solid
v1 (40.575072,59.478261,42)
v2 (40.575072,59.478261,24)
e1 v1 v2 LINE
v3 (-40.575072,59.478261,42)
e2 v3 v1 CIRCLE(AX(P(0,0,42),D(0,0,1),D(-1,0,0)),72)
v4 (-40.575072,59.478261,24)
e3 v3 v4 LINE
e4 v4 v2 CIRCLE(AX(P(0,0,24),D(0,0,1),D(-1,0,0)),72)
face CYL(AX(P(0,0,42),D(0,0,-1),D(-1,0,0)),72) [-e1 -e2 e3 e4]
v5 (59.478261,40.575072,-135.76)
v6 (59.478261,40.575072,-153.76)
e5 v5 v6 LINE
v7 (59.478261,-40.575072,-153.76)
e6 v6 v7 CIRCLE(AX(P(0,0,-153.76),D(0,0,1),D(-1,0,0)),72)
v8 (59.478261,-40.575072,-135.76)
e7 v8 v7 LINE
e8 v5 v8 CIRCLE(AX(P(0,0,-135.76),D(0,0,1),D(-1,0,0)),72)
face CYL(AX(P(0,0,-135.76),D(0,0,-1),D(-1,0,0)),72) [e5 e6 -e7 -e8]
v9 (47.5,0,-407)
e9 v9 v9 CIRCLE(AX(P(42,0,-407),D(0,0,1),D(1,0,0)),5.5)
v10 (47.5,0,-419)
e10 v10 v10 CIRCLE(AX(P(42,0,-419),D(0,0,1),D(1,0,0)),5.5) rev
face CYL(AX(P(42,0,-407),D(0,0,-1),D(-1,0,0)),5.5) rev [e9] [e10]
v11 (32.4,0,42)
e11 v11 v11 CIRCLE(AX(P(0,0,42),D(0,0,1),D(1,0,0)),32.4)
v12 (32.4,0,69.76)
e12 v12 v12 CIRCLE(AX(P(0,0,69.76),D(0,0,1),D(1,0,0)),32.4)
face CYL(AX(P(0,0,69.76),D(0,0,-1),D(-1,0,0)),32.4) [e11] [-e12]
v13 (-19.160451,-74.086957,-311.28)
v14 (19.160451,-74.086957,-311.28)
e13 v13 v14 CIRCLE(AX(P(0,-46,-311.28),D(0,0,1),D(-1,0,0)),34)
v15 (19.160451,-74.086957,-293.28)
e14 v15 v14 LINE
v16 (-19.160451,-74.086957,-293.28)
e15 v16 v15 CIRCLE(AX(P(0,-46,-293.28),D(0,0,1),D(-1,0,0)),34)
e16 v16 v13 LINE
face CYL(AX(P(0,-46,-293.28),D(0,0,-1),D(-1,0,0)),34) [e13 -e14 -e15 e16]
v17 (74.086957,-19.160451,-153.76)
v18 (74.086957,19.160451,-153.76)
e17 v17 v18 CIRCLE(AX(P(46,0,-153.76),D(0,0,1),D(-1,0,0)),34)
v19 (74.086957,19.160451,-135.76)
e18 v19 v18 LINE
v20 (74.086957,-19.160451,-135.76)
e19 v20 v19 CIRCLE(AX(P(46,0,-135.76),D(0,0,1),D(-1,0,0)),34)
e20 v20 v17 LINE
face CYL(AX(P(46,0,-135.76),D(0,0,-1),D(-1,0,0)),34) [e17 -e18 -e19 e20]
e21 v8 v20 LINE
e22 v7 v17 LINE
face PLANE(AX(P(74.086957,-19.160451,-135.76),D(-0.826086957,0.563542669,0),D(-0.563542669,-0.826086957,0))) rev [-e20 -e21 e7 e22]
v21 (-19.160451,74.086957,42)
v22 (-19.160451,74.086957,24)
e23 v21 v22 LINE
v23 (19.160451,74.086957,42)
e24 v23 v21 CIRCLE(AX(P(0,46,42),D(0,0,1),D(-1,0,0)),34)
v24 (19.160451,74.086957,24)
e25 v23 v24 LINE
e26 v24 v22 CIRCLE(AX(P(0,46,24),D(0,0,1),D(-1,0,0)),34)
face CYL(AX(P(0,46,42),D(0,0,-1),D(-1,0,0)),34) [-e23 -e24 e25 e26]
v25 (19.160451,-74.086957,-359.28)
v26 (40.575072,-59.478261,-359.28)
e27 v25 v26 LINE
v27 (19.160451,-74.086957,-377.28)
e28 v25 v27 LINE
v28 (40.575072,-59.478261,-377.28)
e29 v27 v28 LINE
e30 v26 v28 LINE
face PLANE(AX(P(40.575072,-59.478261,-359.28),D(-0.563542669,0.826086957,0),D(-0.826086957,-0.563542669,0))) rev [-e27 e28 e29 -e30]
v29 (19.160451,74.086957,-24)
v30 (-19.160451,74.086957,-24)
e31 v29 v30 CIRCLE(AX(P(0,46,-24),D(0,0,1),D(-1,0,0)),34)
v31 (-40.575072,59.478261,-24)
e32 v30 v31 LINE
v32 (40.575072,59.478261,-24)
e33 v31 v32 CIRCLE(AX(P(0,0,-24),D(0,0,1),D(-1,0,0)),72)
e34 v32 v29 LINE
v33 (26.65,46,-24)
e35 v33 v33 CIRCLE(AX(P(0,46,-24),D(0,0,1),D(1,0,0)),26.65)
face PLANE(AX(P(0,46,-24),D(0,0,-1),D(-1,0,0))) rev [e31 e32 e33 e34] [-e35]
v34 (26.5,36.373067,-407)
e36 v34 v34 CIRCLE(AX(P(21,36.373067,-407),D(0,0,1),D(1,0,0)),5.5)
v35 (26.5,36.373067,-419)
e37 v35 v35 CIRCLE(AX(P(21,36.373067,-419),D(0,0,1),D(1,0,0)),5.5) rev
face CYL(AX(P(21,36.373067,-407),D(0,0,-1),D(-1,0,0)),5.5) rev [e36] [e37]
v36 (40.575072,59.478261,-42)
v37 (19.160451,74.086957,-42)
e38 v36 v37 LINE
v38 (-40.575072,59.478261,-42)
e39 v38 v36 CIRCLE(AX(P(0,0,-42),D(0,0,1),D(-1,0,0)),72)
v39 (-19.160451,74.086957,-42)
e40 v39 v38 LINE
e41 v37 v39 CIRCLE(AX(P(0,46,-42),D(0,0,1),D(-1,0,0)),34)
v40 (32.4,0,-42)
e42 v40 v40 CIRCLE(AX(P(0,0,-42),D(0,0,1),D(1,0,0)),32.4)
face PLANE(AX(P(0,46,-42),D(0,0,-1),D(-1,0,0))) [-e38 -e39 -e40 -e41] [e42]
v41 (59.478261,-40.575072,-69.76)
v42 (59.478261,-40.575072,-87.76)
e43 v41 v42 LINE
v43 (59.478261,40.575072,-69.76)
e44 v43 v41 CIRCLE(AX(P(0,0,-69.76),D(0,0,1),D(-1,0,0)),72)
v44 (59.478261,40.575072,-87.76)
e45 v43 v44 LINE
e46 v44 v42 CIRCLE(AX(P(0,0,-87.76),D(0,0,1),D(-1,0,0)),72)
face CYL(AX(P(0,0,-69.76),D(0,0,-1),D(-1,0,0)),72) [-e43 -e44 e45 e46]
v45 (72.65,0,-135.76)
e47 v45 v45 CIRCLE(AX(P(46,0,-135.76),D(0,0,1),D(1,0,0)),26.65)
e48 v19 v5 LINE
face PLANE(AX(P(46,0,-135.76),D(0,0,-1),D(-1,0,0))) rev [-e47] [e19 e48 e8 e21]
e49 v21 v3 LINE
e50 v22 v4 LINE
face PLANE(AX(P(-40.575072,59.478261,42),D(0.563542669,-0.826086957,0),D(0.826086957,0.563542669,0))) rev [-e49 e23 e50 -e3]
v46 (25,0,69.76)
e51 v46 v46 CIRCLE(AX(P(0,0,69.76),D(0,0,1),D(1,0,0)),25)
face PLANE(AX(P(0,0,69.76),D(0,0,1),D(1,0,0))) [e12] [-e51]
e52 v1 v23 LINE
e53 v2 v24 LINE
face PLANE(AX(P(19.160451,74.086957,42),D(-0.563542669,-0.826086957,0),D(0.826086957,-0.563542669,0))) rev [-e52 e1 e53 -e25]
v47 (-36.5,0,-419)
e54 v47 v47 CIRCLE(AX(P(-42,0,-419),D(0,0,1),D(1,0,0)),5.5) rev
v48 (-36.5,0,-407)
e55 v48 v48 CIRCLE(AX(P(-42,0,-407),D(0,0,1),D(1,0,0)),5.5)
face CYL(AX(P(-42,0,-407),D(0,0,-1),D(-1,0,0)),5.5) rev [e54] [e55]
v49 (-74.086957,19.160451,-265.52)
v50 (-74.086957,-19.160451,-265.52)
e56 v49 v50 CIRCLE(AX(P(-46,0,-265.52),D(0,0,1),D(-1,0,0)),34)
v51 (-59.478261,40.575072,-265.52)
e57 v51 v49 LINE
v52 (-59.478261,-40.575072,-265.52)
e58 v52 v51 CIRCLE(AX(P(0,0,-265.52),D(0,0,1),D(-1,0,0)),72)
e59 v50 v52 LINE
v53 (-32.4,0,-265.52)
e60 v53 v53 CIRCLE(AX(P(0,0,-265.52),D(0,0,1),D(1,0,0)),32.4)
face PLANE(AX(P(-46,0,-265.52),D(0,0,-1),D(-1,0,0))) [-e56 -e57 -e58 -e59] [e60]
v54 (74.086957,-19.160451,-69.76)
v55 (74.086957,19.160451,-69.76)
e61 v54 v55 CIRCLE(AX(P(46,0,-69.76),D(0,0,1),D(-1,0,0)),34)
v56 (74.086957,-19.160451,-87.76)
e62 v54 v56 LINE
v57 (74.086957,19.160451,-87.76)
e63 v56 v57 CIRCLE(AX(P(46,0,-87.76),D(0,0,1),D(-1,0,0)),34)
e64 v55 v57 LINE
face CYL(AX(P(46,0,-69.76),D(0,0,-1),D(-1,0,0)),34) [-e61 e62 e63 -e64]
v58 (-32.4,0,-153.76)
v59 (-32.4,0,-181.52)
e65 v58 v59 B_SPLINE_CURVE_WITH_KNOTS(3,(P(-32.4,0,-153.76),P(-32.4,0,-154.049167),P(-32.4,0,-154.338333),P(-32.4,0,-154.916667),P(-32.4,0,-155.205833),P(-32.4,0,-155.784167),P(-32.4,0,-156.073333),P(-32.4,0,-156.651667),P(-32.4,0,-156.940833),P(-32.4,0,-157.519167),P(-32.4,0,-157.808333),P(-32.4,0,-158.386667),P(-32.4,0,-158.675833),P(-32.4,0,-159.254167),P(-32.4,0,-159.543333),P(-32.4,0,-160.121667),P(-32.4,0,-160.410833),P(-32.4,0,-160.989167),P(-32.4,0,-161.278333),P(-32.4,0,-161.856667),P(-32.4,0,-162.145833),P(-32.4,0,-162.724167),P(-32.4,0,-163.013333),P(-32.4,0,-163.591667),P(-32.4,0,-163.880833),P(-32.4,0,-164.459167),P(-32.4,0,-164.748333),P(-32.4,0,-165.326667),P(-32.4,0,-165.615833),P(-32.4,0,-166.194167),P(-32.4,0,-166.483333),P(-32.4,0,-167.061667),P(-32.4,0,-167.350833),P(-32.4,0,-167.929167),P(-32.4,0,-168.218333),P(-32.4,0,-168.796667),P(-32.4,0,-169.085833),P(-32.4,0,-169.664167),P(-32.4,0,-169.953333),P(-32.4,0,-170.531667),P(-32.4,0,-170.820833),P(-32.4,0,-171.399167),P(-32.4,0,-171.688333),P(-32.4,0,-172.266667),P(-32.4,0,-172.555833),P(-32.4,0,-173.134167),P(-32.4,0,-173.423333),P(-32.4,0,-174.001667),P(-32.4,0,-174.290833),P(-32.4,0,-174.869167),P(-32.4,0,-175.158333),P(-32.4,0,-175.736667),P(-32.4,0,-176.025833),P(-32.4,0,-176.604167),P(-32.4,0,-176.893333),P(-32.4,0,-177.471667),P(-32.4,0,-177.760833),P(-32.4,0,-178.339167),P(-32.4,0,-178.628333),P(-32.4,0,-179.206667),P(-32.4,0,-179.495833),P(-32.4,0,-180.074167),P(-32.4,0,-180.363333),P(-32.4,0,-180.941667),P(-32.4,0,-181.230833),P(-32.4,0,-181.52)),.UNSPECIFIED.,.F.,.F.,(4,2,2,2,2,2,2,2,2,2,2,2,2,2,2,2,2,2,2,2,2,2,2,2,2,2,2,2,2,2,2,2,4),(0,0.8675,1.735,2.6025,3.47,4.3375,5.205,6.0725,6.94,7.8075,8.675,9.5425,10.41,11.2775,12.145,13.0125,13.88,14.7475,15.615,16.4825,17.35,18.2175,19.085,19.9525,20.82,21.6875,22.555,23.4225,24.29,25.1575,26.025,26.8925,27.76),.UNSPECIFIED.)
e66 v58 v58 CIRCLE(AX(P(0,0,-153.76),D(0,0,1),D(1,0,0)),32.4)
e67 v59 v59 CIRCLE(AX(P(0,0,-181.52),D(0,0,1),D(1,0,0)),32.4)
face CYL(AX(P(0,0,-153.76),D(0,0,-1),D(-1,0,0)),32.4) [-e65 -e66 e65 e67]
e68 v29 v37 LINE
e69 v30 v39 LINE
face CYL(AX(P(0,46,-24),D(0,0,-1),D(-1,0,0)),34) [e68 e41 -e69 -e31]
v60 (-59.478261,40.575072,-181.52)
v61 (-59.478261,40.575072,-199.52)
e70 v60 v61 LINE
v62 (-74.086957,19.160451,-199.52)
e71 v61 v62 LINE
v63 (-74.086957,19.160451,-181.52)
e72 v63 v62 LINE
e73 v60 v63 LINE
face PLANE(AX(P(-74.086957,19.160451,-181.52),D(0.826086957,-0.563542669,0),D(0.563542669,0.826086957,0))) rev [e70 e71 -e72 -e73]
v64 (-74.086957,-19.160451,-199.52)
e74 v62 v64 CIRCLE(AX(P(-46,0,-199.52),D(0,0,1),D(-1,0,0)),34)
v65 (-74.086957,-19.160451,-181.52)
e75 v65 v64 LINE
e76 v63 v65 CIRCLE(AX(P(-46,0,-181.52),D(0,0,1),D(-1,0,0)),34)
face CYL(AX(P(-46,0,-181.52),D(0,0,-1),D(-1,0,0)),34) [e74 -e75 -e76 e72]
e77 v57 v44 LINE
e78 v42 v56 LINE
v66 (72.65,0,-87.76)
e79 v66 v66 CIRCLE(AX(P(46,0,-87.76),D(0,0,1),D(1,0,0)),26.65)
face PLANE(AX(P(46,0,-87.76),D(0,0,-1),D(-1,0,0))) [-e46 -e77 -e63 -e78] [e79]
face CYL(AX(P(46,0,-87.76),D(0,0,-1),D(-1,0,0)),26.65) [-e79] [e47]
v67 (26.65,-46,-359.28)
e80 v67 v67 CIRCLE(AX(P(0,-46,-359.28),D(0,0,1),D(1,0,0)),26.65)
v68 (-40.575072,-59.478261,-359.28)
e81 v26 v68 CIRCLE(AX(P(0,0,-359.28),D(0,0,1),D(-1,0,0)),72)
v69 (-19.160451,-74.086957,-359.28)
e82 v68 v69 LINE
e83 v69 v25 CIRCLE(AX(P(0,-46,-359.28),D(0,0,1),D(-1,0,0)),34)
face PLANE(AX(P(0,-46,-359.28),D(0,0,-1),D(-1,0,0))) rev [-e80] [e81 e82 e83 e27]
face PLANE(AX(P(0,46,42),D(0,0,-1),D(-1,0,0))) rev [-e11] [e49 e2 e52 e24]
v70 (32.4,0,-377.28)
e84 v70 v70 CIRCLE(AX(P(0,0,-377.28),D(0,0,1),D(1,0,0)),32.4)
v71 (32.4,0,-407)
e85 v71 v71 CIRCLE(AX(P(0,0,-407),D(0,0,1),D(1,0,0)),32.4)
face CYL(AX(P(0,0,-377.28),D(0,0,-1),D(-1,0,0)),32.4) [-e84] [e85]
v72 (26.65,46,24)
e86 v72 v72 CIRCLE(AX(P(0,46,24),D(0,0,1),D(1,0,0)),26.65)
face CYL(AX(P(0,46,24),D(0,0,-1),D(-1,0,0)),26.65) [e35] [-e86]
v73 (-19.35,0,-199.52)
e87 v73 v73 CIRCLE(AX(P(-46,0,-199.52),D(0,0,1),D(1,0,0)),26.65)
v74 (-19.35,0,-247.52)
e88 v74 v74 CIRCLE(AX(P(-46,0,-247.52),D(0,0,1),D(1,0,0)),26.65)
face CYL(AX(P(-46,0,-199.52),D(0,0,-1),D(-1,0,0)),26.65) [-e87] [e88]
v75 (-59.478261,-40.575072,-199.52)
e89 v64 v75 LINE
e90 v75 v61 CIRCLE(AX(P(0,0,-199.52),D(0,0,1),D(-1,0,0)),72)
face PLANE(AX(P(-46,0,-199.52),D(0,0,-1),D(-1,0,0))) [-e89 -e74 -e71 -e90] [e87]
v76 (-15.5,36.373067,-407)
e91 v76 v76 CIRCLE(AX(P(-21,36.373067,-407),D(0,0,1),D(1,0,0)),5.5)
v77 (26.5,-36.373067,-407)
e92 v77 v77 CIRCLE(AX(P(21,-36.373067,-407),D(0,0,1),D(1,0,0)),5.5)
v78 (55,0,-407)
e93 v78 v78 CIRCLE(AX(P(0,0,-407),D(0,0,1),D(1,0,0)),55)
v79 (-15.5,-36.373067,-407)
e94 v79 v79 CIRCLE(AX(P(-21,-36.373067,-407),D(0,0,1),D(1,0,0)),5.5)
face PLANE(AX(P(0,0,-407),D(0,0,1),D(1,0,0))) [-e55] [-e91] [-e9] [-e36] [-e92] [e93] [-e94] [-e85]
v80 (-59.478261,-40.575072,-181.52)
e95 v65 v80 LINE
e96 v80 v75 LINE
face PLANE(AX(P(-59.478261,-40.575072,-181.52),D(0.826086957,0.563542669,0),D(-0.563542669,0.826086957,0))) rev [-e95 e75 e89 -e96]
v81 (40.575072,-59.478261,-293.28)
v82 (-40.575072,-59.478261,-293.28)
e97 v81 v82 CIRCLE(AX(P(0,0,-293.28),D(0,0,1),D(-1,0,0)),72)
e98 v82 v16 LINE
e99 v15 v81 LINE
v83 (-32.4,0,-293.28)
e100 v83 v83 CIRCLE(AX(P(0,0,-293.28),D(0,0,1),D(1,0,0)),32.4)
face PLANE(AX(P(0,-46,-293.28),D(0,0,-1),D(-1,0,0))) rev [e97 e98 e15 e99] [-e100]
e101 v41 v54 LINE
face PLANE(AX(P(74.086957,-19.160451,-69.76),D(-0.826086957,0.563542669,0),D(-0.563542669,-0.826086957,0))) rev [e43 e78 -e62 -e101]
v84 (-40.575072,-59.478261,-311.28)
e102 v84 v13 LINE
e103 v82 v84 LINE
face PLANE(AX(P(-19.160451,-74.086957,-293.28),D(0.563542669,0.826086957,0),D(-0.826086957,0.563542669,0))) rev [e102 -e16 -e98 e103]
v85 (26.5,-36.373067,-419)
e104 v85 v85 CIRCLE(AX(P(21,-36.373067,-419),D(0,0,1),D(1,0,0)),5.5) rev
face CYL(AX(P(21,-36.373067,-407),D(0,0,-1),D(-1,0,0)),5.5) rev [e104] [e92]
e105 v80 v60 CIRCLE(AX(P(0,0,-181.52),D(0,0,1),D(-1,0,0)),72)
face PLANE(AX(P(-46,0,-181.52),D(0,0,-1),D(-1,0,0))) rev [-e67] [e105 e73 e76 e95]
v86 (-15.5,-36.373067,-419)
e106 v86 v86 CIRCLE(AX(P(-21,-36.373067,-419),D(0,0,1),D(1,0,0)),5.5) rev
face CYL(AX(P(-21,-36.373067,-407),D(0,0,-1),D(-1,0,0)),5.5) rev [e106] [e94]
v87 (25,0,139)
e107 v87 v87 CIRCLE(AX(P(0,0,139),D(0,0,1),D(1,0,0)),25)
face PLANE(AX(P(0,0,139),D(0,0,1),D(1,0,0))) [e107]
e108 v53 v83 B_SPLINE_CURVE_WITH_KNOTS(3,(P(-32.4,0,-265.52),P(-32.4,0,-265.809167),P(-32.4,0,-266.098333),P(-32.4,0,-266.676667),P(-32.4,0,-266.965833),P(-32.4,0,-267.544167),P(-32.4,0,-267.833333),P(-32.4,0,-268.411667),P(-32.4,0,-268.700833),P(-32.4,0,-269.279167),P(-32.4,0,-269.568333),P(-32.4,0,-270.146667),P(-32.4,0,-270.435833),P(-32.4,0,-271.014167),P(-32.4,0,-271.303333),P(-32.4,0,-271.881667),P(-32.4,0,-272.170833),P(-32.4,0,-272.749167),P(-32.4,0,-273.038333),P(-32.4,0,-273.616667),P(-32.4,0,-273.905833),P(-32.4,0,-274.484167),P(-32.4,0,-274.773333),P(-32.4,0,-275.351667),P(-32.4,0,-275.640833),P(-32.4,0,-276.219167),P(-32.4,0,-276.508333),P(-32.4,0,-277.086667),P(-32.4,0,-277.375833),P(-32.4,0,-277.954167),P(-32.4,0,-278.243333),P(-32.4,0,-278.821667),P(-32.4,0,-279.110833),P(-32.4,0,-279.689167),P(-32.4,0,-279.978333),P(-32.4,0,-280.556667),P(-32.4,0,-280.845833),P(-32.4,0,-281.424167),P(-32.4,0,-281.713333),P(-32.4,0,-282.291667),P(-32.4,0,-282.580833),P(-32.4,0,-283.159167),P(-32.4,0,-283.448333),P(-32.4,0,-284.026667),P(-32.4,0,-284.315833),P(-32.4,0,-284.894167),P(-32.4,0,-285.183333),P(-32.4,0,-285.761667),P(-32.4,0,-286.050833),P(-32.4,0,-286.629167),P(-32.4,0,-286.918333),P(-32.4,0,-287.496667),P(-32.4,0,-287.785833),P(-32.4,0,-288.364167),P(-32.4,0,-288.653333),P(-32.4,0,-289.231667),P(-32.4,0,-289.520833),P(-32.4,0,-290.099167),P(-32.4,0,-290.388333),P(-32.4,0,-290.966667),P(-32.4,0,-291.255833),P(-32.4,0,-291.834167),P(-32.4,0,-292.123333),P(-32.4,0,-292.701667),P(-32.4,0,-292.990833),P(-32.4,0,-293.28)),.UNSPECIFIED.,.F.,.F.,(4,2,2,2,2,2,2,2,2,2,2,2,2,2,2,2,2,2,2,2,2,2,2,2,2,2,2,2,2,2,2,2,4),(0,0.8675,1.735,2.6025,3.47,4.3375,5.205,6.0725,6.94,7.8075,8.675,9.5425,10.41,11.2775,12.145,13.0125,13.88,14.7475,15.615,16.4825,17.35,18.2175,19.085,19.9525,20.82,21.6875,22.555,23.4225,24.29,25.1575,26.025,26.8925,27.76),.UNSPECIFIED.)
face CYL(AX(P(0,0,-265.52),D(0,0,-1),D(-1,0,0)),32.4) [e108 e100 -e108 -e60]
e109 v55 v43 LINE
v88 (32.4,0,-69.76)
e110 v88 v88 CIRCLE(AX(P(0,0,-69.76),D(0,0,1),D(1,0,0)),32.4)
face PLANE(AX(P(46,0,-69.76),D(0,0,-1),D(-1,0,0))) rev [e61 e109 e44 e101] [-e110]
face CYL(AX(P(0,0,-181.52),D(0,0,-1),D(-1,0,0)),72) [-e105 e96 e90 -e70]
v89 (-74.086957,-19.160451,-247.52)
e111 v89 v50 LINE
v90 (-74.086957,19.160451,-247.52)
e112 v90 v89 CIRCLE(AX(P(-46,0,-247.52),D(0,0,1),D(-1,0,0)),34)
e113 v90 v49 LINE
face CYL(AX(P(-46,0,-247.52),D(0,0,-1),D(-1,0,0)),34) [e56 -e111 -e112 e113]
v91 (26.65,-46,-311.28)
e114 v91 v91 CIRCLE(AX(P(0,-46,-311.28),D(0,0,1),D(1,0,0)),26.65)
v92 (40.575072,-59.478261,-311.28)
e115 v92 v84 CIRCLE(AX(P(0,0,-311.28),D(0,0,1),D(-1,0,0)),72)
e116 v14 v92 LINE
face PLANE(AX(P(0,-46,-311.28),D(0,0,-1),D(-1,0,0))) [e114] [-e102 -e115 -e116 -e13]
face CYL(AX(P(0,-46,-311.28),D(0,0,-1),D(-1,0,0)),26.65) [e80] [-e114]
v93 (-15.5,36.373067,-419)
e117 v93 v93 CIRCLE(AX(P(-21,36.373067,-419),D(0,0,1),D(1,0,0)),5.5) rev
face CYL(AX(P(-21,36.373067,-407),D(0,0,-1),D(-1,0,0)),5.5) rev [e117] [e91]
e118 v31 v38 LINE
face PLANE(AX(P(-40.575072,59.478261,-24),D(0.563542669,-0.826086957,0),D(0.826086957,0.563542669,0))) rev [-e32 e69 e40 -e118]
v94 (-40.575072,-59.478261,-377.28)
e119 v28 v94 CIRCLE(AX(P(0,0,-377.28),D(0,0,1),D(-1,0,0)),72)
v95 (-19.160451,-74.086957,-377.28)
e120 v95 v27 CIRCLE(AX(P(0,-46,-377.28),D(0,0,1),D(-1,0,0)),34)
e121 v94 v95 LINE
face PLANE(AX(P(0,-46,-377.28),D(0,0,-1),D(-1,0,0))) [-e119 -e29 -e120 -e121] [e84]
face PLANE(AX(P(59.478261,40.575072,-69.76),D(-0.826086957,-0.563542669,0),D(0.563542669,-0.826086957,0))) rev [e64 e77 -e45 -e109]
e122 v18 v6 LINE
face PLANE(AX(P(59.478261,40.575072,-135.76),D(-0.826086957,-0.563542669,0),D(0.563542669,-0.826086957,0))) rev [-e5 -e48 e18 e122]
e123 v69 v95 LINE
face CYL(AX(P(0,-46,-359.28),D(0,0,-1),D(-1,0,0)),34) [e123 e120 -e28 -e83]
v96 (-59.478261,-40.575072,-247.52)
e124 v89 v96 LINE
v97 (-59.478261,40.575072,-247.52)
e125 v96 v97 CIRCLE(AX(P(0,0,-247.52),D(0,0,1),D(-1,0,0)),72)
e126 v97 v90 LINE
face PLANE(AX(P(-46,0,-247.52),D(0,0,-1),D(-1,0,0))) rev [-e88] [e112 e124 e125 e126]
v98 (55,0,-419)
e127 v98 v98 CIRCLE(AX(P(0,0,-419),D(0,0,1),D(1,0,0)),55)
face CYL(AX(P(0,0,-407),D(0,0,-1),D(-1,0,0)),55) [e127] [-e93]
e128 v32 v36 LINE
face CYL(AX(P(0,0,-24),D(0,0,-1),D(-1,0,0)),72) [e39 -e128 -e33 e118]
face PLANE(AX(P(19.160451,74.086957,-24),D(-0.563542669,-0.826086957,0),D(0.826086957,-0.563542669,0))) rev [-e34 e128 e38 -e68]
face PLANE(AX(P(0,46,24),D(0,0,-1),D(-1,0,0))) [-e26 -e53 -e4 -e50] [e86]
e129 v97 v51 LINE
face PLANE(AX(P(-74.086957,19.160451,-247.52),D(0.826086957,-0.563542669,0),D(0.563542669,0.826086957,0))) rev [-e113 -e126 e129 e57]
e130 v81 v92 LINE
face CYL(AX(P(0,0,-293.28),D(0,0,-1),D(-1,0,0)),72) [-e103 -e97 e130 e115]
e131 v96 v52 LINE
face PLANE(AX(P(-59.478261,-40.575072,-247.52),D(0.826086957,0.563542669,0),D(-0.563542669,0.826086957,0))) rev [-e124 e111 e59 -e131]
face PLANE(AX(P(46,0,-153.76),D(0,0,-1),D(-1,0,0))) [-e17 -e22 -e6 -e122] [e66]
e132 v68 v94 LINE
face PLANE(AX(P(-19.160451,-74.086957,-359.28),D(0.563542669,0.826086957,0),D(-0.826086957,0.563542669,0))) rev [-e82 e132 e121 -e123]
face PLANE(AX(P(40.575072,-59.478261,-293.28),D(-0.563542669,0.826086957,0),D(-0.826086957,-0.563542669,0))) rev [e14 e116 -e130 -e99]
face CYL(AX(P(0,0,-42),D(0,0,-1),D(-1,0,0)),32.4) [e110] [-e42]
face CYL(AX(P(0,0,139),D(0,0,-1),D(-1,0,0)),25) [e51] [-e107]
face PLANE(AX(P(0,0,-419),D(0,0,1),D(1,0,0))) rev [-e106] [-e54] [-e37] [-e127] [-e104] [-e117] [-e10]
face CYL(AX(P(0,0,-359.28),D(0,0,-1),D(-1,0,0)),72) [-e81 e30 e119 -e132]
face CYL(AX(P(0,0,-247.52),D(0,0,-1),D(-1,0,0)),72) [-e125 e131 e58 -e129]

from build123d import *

# Parameters (mm, degrees)
MAIN_START              = 42
SKETCH1_R               = 32.4
MAIN_JOURNAL_1_DEPTH    = 27.76
MAIN_START_2            = -69.76
SKETCH2_R               = 32.4
MAIN_JOURNAL_2_DEPTH    = 27.76
MAIN_START_3            = -181.52
SKETCH3_R               = 32.4
MAIN_JOURNAL_3_DEPTH    = 27.76
MAIN_START_4            = -293.28
SKETCH4_R               = 32.4
MAIN_JOURNAL_4_DEPTH    = 27.76
MAIN_START_5            = -407
SKETCH5_R               = 32.4
MAIN_JOURNAL_5_DEPTH    = 29.72
SNOUT_START             = 69.76
SKETCH6_R               = 25
SNOUT_DEPTH             = 69.24
FLYWHEEL_START          = -419
SKETCH7_R               = 55
FLYWHEEL_FLANGE_DEPTH   = 12
ROD_START               = -24
SKETCH8_R               = 26.65
ROD_JOURNAL_1_DEPTH     = 48
WEB_START               = 24
WEB_1A_DEPTH            = 18
WEB_START_2             = -42
WEB_1B_DEPTH            = 18
ROD_START_2             = -135.76
SKETCH11_R              = 26.65
ROD_JOURNAL_2_DEPTH     = 48
WEB_START_3             = -87.76
WEB_2A_DEPTH            = 18
WEB_START_4             = -153.76
WEB_2B_DEPTH            = 18
ROD_START_3             = -247.52
SKETCH14_R              = 26.65
ROD_JOURNAL_3_DEPTH     = 48
WEB_START_5             = -199.52
WEB_3A_DEPTH            = 18
WEB_START_6             = -265.52
WEB_3B_DEPTH            = 18
ROD_START_4             = -359.28
SKETCH17_R              = 26.65
ROD_JOURNAL_4_DEPTH     = 48
WEB_START_7             = -311.28
WEB_4A_DEPTH            = 18
WEB_START_8             = -377.28
WEB_4B_DEPTH            = 18
FLANGE_START            = -420
SKETCH20_R              = 5.5
FLANGE_BOLT_HOLES_DEPTH = 13


with BuildPart() as part:
    # Sketch1 → Main Journal 1 (new body)
    with BuildSketch(Plane.XY.offset(MAIN_START)):
        Circle(SKETCH1_R)
    extrude(amount=MAIN_JOURNAL_1_DEPTH)

    # Sketch6 → Snout (add)
    with BuildSketch(Plane.XY.offset(SNOUT_START)):
        Circle(SKETCH6_R)
    extrude(amount=SNOUT_DEPTH)



with BuildPart() as body_2:
    # Sketch2 → Main Journal 2 (new body)
    with BuildSketch(Plane.XY.offset(MAIN_START_2)):
        Circle(SKETCH2_R)
    extrude(amount=MAIN_JOURNAL_2_DEPTH)


with BuildPart() as body_3:
    # Sketch3 → Main Journal 3 (new body)
    with BuildSketch(Plane.XY.offset(MAIN_START_3)):
        Circle(SKETCH3_R)
    extrude(amount=MAIN_JOURNAL_3_DEPTH)


with BuildPart() as body_4:
    # Sketch4 → Main Journal 4 (new body)
    with BuildSketch(Plane.XY.offset(MAIN_START_4)):
        Circle(SKETCH4_R)
    extrude(amount=MAIN_JOURNAL_4_DEPTH)


with BuildPart() as body_5:
    # Sketch5 → Main Journal 5 (new body)
    with BuildSketch(Plane.XY.offset(MAIN_START_5)):
        Circle(SKETCH5_R)
    extrude(amount=MAIN_JOURNAL_5_DEPTH)

    # Sketch7 → Flywheel Flange (add)
    with BuildSketch(Plane.XY.offset(FLYWHEEL_START)):
        Circle(SKETCH7_R)
    extrude(amount=FLYWHEEL_FLANGE_DEPTH)


with BuildPart() as body_6:
    # Sketch8 → Rod Journal 1 (new body)
    with BuildSketch(Plane.XY.offset(ROD_START)):
        with Locations((0, 46)):
            Circle(SKETCH8_R)
    extrude(amount=ROD_JOURNAL_1_DEPTH)


with BuildPart() as part_1:
    add(part.part)

    add(body_6.part)  # Web 1A merges body 6
    # Sketch9 → Web 1A (add)
    with BuildSketch(Plane.XY.offset(WEB_START)):
        with BuildLine():
            Line((19.160450761, 74.086956522), (40.575072199, 59.47826087))
            ThreePointArc((40.575072199, 59.47826087), (0, -72), (-40.575072199, 59.47826087))
            Line((-40.575072199, 59.47826087), (-19.160450761, 74.086956522))
            ThreePointArc((-19.160450761, 74.086956522), (0, 80), (19.160450761, 74.086956522))
        make_face()
    extrude(amount=WEB_1A_DEPTH)


    add(body_2.part)  # Web 1B merges body 2
    # Sketch10 → Web 1B (add)
    with BuildSketch(Plane.XY.offset(WEB_START_2)):
        with BuildLine():
            Line((19.160450761, 74.086956522), (40.575072199, 59.47826087))
            ThreePointArc((40.575072199, 59.47826087), (0, -72), (-40.575072199, 59.47826087))
            Line((-40.575072199, 59.47826087), (-19.160450761, 74.086956522))
            ThreePointArc((-19.160450761, 74.086956522), (0, 80), (19.160450761, 74.086956522))
        make_face()
    extrude(amount=WEB_1B_DEPTH)



with BuildPart() as body_5_2:
    # Sketch11 → Rod Journal 2 (new body)
    with BuildSketch(Plane.XY.offset(ROD_START_2)):
        with Locations((46, 0)):
            Circle(SKETCH11_R)
    extrude(amount=ROD_JOURNAL_2_DEPTH)


with BuildPart() as part_2:
    add(part_1.part)

    add(body_5_2.part)  # Web 2A merges body 5 2
    # Sketch12 → Web 2A (add)
    with BuildSketch(Plane.XY.offset(WEB_START_3)):
        with BuildLine():
            Line((74.086956522, -19.160450761), (59.47826087, -40.575072199))
            ThreePointArc((59.47826087, -40.575072199), (-72, 0), (59.47826087, 40.575072199))
            Line((59.47826087, 40.575072199), (74.086956522, 19.160450761))
            ThreePointArc((74.086956522, 19.160450761), (80, 0), (74.086956522, -19.160450761))
        make_face()
    extrude(amount=WEB_2A_DEPTH)


    add(body_3.part)  # Web 2B merges body 3
    # Sketch13 → Web 2B (add)
    with BuildSketch(Plane.XY.offset(WEB_START_4)):
        with BuildLine():
            Line((74.086956522, -19.160450761), (59.47826087, -40.575072199))
            ThreePointArc((59.47826087, -40.575072199), (-72, 0), (59.47826087, 40.575072199))
            Line((59.47826087, 40.575072199), (74.086956522, 19.160450761))
            ThreePointArc((74.086956522, 19.160450761), (80, 0), (74.086956522, -19.160450761))
        make_face()
    extrude(amount=WEB_2B_DEPTH)



with BuildPart() as body_4_2:
    # Sketch14 → Rod Journal 3 (new body)
    with BuildSketch(Plane.XY.offset(ROD_START_3)):
        with Locations((-46, 0)):
            Circle(SKETCH14_R)
    extrude(amount=ROD_JOURNAL_3_DEPTH)


with BuildPart() as part_3:
    add(part_2.part)

    add(body_4_2.part)  # Web 3A merges body 4 2
    # Sketch15 → Web 3A (add)
    with BuildSketch(Plane.XY.offset(WEB_START_5)):
        with BuildLine():
            Line((-74.086956522, 19.160450761), (-59.47826087, 40.575072199))
            ThreePointArc((-59.47826087, 40.575072199), (72, 0), (-59.47826087, -40.575072199))
            Line((-59.47826087, -40.575072199), (-74.086956522, -19.160450761))
            ThreePointArc((-74.086956522, -19.160450761), (-80, 0), (-74.086956522, 19.160450761))
        make_face()
    extrude(amount=WEB_3A_DEPTH)


    add(body_4.part)  # Web 3B merges body 4
    # Sketch16 → Web 3B (add)
    with BuildSketch(Plane.XY.offset(WEB_START_6)):
        with BuildLine():
            Line((-74.086956522, 19.160450761), (-59.47826087, 40.575072199))
            ThreePointArc((-59.47826087, 40.575072199), (72, 0), (-59.47826087, -40.575072199))
            Line((-59.47826087, -40.575072199), (-74.086956522, -19.160450761))
            ThreePointArc((-74.086956522, -19.160450761), (-80, 0), (-74.086956522, 19.160450761))
        make_face()
    extrude(amount=WEB_3B_DEPTH)



with BuildPart() as body_3_2:
    # Sketch17 → Rod Journal 4 (new body)
    with BuildSketch(Plane.XY.offset(ROD_START_4)):
        with Locations((0, -46)):
            Circle(SKETCH17_R)
    extrude(amount=ROD_JOURNAL_4_DEPTH)


with BuildPart() as part_4:
    add(part_3.part)

    add(body_3_2.part)  # Web 4A merges body 3 2
    # Sketch18 → Web 4A (add)
    with BuildSketch(Plane.XY.offset(WEB_START_7)):
        with BuildLine():
            Line((-19.160450761, -74.086956522), (-40.575072199, -59.47826087))
            ThreePointArc((-40.575072199, -59.47826087), (0, 72), (40.575072199, -59.47826087))
            Line((40.575072199, -59.47826087), (19.160450761, -74.086956522))
            ThreePointArc((19.160450761, -74.086956522), (0, -80), (-19.160450761, -74.086956522))
        make_face()
    extrude(amount=WEB_4A_DEPTH)


    add(body_5.part)  # Web 4B merges body 5
    # Sketch19 → Web 4B (add)
    with BuildSketch(Plane.XY.offset(WEB_START_8)):
        with BuildLine():
            Line((-19.160450761, -74.086956522), (-40.575072199, -59.47826087))
            ThreePointArc((-40.575072199, -59.47826087), (0, 72), (40.575072199, -59.47826087))
            Line((40.575072199, -59.47826087), (19.160450761, -74.086956522))
            ThreePointArc((19.160450761, -74.086956522), (0, -80), (-19.160450761, -74.086956522))
        make_face()
    extrude(amount=WEB_4B_DEPTH)

    # Sketch20 → Flange Bolt Holes (cut)
    with BuildSketch(Plane.XY.offset(FLANGE_START)):
        with Locations((42, 0)):
            Circle(SKETCH20_R)
        with Locations((21, 36.373066959)):
            Circle(SKETCH20_R)
        with Locations((-21, 36.373066959)):
            Circle(SKETCH20_R)
        with Locations((-42, 0)):
            Circle(SKETCH20_R)
        with Locations((-21, -36.373066959)):
            Circle(SKETCH20_R)
        with Locations((21, -36.373066959)):
            Circle(SKETCH20_R)
    extrude(amount=FLANGE_BOLT_HOLES_DEPTH, mode=Mode.SUBTRACT)


solid = part_4.part
